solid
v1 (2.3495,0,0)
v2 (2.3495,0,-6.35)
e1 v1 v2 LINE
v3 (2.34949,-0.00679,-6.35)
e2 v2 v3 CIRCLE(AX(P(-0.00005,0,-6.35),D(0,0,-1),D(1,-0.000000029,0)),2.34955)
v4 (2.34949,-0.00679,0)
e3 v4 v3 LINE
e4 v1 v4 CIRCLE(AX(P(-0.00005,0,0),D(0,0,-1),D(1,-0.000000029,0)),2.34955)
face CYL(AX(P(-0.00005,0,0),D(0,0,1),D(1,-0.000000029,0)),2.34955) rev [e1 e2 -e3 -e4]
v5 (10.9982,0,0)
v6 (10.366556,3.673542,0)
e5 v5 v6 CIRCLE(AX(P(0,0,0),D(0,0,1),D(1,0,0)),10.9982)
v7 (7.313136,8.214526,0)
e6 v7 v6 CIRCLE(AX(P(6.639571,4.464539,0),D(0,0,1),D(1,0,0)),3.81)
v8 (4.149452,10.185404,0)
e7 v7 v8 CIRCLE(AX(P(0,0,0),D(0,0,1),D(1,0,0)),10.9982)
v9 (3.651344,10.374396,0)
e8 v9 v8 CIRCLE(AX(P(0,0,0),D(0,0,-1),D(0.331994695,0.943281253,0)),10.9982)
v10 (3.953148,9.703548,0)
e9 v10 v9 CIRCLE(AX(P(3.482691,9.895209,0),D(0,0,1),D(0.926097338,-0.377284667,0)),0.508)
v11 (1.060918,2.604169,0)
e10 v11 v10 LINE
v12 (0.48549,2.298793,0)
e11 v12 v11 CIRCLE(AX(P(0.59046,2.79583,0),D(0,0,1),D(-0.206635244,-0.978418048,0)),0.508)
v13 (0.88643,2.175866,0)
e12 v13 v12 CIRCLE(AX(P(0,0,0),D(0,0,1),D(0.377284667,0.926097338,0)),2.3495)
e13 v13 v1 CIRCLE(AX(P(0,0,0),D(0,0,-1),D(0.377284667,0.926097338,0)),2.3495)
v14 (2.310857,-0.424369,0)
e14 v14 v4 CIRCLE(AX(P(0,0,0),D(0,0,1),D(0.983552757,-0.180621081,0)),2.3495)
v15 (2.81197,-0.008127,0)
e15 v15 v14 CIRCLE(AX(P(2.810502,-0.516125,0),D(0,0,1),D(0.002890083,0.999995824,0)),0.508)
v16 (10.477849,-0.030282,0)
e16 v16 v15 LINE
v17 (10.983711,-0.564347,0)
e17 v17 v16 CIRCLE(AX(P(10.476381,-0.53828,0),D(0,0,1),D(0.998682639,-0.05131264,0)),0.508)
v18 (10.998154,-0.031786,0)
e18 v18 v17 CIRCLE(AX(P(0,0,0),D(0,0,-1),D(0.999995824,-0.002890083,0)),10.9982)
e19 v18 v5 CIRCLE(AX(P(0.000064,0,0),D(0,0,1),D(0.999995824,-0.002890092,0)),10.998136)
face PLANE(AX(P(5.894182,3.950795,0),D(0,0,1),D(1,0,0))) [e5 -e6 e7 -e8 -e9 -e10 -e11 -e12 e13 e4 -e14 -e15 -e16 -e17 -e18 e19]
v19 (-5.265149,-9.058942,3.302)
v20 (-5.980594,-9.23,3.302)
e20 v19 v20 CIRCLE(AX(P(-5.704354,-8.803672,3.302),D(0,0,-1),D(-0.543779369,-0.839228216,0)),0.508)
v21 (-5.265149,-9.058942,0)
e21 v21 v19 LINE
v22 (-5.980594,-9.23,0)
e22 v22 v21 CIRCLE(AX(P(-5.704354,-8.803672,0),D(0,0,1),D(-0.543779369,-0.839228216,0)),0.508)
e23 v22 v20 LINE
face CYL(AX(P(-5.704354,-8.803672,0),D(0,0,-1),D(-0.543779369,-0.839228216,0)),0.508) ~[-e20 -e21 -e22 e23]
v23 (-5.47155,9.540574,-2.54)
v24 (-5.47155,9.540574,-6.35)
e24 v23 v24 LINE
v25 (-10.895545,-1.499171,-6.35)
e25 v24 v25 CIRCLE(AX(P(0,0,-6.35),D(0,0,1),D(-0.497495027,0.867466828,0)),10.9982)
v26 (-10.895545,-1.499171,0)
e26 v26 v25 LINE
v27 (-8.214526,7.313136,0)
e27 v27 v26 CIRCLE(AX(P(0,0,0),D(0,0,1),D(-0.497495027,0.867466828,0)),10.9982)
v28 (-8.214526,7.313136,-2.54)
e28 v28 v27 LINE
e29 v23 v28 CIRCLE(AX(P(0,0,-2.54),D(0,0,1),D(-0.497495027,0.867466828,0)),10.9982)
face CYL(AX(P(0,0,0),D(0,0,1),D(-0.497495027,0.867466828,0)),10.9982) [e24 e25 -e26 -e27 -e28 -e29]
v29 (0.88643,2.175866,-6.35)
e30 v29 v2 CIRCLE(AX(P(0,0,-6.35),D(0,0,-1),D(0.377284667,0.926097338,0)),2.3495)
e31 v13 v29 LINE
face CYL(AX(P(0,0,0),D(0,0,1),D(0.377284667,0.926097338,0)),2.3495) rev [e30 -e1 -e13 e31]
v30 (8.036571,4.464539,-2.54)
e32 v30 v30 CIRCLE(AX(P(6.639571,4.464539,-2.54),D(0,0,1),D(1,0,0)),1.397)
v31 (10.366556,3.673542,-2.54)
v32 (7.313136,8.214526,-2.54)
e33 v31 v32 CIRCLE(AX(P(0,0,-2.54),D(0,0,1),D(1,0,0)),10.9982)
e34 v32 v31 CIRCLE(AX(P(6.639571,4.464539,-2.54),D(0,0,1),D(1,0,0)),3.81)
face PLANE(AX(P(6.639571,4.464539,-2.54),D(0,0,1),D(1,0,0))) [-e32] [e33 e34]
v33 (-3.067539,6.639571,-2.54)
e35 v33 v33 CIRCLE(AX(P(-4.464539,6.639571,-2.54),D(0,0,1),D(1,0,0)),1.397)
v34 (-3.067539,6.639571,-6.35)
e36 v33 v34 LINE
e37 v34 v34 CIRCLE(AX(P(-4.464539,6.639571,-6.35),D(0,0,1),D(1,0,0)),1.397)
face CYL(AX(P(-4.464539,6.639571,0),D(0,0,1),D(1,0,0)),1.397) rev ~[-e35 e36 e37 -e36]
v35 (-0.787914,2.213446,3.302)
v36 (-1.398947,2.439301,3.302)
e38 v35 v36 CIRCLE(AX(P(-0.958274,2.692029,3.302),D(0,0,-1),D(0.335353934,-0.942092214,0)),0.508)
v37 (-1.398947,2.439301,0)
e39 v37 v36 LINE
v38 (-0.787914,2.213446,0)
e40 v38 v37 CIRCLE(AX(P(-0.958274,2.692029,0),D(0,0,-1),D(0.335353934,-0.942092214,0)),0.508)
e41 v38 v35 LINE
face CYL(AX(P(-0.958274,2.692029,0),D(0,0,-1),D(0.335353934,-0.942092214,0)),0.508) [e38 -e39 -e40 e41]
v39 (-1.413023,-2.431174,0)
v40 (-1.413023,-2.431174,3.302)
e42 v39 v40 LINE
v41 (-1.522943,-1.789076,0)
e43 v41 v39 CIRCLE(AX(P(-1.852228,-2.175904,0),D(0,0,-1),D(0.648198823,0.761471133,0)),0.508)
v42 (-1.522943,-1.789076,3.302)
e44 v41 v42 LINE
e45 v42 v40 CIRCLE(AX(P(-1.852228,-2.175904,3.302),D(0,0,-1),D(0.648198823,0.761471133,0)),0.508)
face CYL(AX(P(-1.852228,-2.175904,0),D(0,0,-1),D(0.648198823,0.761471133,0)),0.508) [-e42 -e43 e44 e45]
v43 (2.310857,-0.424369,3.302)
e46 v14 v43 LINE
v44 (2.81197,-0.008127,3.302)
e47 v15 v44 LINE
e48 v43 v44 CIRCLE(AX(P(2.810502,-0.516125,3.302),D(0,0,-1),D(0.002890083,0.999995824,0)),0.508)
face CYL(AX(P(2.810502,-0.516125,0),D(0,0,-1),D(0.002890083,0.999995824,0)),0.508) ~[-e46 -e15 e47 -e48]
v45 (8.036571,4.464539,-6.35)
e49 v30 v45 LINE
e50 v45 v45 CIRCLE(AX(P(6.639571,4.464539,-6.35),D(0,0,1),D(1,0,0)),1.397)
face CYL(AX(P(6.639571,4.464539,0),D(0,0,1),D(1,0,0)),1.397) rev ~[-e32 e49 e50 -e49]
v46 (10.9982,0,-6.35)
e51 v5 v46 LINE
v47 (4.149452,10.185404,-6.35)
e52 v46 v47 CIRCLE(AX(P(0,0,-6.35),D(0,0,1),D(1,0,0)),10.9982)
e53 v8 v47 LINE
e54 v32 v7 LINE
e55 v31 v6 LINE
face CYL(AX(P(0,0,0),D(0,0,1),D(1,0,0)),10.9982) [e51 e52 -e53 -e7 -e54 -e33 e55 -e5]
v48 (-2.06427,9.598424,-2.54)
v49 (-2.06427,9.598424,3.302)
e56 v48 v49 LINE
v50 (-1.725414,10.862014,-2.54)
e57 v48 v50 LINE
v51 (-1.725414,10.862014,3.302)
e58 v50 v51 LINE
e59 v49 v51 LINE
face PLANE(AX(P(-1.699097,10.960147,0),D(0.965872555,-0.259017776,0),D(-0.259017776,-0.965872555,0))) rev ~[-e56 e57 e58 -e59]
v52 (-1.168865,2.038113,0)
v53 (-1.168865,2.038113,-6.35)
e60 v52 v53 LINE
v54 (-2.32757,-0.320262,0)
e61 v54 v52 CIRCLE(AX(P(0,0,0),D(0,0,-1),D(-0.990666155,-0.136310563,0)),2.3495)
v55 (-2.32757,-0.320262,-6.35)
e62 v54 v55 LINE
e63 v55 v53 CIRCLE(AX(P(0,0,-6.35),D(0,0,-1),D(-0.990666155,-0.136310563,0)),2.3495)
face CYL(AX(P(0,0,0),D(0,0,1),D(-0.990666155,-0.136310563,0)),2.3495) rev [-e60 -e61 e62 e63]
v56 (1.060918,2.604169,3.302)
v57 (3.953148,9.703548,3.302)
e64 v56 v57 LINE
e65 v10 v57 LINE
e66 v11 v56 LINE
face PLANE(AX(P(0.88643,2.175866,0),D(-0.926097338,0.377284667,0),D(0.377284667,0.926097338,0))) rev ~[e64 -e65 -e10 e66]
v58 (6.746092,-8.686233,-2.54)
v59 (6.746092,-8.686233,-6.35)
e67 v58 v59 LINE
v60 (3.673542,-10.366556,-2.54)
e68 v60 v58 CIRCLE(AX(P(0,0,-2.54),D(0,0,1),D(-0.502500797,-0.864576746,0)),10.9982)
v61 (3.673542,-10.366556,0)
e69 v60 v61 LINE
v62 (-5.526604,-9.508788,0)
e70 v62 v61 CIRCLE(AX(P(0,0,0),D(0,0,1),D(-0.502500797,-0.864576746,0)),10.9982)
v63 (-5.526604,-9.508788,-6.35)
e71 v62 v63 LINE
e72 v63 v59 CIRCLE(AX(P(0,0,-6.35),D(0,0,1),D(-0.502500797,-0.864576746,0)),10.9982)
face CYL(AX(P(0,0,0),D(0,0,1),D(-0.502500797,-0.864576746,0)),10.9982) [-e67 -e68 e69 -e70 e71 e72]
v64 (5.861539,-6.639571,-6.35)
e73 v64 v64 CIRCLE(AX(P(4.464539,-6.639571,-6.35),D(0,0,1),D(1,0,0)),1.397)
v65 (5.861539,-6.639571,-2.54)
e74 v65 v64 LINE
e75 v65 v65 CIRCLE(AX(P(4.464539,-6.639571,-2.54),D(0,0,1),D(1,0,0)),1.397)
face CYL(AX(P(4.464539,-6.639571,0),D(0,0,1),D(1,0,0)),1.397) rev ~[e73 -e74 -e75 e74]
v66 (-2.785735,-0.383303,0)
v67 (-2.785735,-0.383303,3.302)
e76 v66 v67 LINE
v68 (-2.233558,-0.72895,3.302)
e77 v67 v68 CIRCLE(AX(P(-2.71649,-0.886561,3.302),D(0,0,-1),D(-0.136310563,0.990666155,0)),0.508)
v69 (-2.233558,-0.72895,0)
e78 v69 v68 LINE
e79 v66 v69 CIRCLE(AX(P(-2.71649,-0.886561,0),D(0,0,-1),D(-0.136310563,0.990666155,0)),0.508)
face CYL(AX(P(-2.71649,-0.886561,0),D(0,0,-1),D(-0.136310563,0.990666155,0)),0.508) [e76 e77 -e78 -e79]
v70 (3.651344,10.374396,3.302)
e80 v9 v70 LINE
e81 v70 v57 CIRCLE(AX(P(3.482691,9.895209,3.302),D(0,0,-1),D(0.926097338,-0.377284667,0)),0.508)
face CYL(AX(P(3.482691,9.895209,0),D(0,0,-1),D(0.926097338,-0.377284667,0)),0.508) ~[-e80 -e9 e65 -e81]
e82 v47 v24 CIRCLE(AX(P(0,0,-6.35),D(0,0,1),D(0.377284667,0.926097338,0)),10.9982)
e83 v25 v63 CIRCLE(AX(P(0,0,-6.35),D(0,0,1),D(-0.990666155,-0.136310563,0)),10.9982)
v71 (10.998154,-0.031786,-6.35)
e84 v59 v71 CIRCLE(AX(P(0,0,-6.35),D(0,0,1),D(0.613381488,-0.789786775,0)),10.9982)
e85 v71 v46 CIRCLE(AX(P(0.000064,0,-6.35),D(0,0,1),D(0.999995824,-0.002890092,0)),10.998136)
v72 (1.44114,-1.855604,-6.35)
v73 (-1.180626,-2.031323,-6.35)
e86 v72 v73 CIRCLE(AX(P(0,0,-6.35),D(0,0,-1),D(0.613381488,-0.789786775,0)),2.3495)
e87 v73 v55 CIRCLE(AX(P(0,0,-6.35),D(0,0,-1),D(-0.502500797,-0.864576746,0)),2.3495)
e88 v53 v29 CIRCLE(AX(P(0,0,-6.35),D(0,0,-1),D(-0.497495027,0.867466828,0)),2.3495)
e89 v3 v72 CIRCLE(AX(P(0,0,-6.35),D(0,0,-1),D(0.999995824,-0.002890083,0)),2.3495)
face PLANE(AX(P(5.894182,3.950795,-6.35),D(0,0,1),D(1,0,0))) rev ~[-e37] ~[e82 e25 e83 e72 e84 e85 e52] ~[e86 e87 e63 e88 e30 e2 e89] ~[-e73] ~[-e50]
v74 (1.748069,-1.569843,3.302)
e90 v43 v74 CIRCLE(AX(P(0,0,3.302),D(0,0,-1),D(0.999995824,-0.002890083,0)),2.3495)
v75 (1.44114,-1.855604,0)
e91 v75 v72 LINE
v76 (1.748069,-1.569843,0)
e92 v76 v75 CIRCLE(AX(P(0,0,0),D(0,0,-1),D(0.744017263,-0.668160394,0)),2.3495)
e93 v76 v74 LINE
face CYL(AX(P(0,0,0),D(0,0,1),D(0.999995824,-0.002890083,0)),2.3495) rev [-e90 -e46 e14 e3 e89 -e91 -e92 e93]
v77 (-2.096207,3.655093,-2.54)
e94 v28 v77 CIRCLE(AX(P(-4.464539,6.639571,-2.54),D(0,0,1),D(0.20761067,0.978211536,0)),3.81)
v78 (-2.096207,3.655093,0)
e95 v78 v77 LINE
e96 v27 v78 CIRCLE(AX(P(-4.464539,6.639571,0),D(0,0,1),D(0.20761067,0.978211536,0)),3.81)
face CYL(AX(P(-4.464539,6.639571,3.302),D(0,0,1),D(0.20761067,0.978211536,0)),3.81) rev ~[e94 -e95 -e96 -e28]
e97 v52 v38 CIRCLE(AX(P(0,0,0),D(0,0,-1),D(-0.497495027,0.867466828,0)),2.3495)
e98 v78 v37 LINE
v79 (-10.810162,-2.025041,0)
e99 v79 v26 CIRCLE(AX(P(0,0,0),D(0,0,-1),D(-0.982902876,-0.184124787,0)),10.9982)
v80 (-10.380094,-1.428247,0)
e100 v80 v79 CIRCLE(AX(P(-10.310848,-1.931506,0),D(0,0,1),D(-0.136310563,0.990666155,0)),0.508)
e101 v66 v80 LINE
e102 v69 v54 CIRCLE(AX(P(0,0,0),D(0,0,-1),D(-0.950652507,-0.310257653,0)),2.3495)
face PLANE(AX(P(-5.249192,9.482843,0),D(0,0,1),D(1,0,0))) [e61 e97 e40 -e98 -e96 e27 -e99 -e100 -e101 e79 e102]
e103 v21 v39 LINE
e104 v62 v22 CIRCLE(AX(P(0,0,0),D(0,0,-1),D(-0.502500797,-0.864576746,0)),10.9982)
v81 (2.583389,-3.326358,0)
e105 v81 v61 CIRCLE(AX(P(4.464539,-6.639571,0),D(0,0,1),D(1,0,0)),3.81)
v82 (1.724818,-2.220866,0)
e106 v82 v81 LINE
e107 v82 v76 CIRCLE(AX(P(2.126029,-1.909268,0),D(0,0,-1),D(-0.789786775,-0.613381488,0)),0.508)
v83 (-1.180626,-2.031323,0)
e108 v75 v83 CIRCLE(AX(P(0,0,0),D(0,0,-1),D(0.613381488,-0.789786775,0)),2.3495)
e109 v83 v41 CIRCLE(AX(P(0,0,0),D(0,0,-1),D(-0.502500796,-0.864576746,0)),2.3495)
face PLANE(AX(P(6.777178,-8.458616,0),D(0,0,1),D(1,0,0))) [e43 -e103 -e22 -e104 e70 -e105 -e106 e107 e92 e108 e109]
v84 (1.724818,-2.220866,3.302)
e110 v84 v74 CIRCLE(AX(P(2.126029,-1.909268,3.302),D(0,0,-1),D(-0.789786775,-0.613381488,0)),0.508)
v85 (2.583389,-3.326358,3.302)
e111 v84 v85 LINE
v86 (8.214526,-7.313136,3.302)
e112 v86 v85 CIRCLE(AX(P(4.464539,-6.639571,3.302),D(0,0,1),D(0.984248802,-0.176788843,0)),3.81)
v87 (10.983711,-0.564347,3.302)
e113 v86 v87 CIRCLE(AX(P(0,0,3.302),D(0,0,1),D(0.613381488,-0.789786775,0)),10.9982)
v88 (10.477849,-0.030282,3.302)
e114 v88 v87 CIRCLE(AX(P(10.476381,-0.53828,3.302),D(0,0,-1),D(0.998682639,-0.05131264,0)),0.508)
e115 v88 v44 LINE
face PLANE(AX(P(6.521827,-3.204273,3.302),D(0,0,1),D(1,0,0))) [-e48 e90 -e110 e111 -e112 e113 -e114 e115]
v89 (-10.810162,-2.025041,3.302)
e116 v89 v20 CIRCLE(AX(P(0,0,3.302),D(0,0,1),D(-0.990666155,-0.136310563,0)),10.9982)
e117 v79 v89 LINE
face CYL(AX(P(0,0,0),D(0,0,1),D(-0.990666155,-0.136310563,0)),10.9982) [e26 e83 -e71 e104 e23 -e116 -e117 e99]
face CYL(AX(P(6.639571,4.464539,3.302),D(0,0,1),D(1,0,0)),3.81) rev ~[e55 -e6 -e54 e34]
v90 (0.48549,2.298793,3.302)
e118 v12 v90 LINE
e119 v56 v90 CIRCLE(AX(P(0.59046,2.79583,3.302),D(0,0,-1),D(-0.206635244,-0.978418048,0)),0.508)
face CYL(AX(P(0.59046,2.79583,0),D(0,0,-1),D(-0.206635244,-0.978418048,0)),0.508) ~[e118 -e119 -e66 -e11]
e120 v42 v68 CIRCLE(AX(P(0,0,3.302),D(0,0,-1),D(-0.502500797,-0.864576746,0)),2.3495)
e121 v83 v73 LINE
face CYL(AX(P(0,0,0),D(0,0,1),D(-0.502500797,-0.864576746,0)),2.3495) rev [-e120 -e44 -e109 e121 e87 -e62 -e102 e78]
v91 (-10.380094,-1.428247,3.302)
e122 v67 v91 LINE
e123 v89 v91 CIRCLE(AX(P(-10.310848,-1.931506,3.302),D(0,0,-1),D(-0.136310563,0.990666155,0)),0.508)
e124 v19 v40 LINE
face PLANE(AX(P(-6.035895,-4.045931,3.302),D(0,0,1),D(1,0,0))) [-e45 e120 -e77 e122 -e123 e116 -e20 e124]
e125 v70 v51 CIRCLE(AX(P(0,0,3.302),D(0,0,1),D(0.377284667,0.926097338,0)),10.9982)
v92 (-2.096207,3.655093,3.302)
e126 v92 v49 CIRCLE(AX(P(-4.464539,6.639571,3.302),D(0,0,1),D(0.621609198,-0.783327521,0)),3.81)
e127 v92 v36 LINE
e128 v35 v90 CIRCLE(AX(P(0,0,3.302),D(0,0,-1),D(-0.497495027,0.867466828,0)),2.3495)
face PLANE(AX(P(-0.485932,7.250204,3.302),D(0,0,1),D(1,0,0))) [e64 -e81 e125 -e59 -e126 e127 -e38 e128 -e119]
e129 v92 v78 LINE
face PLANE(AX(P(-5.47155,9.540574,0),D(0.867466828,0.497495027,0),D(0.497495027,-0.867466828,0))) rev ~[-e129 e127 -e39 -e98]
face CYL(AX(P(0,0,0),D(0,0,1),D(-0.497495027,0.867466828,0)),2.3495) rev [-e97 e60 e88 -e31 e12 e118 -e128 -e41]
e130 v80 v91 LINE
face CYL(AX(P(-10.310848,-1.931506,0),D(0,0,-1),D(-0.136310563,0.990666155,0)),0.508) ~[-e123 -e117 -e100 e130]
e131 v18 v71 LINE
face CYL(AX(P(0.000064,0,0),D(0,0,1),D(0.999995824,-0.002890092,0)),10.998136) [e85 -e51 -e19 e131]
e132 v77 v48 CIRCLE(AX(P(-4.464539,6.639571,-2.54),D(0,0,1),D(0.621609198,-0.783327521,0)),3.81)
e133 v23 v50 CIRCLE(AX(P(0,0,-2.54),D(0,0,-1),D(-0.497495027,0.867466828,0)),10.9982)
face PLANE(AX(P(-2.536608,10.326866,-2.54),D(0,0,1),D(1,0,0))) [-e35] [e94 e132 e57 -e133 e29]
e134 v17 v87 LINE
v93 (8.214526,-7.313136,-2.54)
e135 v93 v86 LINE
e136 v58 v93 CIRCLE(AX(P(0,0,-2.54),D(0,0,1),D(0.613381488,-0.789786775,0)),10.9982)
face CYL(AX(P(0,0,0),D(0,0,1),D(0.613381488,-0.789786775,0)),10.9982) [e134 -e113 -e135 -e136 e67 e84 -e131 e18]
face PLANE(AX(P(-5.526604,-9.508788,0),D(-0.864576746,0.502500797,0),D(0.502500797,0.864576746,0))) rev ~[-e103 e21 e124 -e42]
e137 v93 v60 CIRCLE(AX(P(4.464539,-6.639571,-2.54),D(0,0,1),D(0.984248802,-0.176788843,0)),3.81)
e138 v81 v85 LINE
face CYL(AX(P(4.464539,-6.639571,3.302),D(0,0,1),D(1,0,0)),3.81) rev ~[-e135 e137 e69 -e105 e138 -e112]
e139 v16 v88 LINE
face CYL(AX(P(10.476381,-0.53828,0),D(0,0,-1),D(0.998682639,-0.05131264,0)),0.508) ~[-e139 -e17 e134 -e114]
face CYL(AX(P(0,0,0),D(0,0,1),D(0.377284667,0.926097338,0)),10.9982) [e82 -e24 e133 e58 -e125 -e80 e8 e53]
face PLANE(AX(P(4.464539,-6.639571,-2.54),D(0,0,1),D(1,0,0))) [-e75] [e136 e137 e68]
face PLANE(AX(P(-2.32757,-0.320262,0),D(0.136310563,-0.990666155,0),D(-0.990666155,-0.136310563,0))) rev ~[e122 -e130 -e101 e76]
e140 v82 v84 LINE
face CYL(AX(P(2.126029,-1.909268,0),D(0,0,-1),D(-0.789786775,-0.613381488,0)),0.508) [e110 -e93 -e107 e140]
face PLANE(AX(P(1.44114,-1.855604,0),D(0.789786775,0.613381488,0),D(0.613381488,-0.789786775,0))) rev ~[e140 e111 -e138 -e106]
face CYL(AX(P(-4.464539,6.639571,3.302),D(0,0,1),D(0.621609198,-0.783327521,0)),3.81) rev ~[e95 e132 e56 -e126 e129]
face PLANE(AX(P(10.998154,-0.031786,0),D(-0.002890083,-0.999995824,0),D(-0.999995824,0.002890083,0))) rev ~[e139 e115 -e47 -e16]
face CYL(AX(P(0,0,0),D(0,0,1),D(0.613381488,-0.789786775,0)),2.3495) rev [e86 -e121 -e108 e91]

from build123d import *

# Parameters (mm, degrees)
F1_DEPTH      = 3.302
F2_DEPTH      = 6.35
F3_T1_DEPTH   = 4.6338919233
F4_T1_DEPTH   = 4.4582047696
F5_R          = 1.397
F6_DEPTH      = 6.351
F6_DEPTH_BACK = 25.4
F7_R          = 3.81
F8_DEPTH      = 5.842
F9_T1_DEPTH   = 8.456355204
F9_T3_DEPTH   = 2.54


# Not quite as in the source:
# - a fillet or chamfer that OpenCascade refuses, or shapes differently, is made with other operations: its cross-section is extruded or revolved along the edge and cut away or added


with BuildPart() as f1:
    # F0 (on Top) → F1 (new body)
    with BuildSketch(Plane.XY):
        with BuildLine():
            Line((0.8864303251, 2.1758656964), (4.1494522244, 10.1854037464))
            ThreePointArc((4.1494522244, 10.1854037464), (-0.7354841661, 10.9735803766), (-5.4715498037, 9.5405736717))
            Line((-5.4715498037, 9.5405736717), (-1.1688645655, 2.0381133132))
            ThreePointArc((-1.1688645655, 2.0381133132), (-0.157118442, 2.3442406116), (0.8864303251, 2.1758656964))
        make_face()
    extrude(amount=F1_DEPTH)



with BuildPart() as f1b:
    # F0 (on Top) → F1, piece 2 (new body)
    with BuildSketch(Plane.XY):
        with BuildLine():
            Line((-2.3275701308, -0.320261668), (-10.8955445044, -1.4991708351))
            ThreePointArc((-10.8955445044, -1.4991708351), (-9.1356572935, -6.1237381602), (-5.5266042645, -9.5087879639))
            Line((-5.5266042645, -9.5087879639), (-1.1806256223, -2.0313230639))
            ThreePointArc((-1.1806256223, -2.0313230639), (-1.9516127013, -1.3081888679), (-2.3275701308, -0.320261668))
        make_face()
    extrude(amount=F1_DEPTH)


with BuildPart() as f1c:
    # F0 (on Top) → F1, piece 3 (new body)
    with BuildSketch(Plane.XY):
        with BuildLine():
            ThreePointArc((6.74609228, -8.6862329113), (9.8711414597, -4.8498422164), (10.9981540682, -0.0317857078))
            Line((10.9981540682, -0.0317857078), (2.3494901878, -0.0067902494))
            ThreePointArc((2.3494901878, -0.0067902494), (2.1087311432, -1.0360517437), (1.4411398058, -1.8556040284))
            Line((1.4411398058, -1.8556040284), (6.74609228, -8.6862329113))
        make_face()
    extrude(amount=F1_DEPTH)


with BuildPart() as f1_1:
    add(f1.part)

    add(f1b.part)  # F2 merges F1b

    add(f1c.part)  # F2 merges F1c
    # F0 (on Top) → F2 (join)
    with BuildSketch(Plane.XY):
        with BuildLine():
            ThreePointArc((10.9981540682, -0.0317857078), (10.9981885171, -0.0158928705), (10.9982, 0))
            ThreePointArc((10.9982, 0), (9.1267986911, 6.136933183), (4.1494522244, 10.1854037464))
            Line((4.1494522244, 10.1854037464), (0.8864303251, 2.1758656964))
            ThreePointArc((0.8864303251, 2.1758656964), (1.9497202747, 1.3110076661), (2.3495, 0))
            ThreePointArc((2.3495, 0), (2.3494975469, -0.0033951282), (2.3494901878, -0.0067902494))
            Line((2.3494901878, -0.0067902494), (10.9981540682, -0.0317857078))
        make_face()
        with BuildLine():
            Line((0.8864303251, 2.1758656964), (4.1494522244, 10.1854037464))
            ThreePointArc((4.1494522244, 10.1854037464), (-0.7354841661, 10.9735803766), (-5.4715498037, 9.5405736717))
            Line((-5.4715498037, 9.5405736717), (-1.1688645655, 2.0381133132))
            ThreePointArc((-1.1688645655, 2.0381133132), (-0.157118442, 2.3442406116), (0.8864303251, 2.1758656964))
        make_face()
        with BuildLine():
            ThreePointArc((6.74609228, -8.6862329113), (9.8711414597, -4.8498422164), (10.9981540682, -0.0317857078))
            Line((10.9981540682, -0.0317857078), (2.3494901878, -0.0067902494))
            ThreePointArc((2.3494901878, -0.0067902494), (2.1087311432, -1.0360517437), (1.4411398058, -1.8556040284))
            Line((1.4411398058, -1.8556040284), (6.74609228, -8.6862329113))
        make_face()
        with BuildLine():
            Line((-1.1688645655, 2.0381133132), (-5.4715498037, 9.5405736717))
            ThreePointArc((-5.4715498037, 9.5405736717), (-9.8711414597, 4.8498422164), (-10.8955445044, -1.4991708351))
            Line((-10.8955445044, -1.4991708351), (-2.3275701308, -0.320261668))
            ThreePointArc((-2.3275701308, -0.320261668), (-2.1087311432, 1.0360517437), (-1.1688645655, 2.0381133132))
        make_face()
        with BuildLine():
            ThreePointArc((-5.5266042645, -9.5087879639), (0.7354841661, -10.9735803766), (6.74609228, -8.6862329113))
            Line((6.74609228, -8.6862329113), (1.4411398058, -1.8556040284))
            ThreePointArc((1.4411398058, -1.8556040284), (0.157118442, -2.3442406116), (-1.1806256223, -2.0313230639))
            Line((-1.1806256223, -2.0313230639), (-5.5266042645, -9.5087879639))
        make_face()
        with BuildLine():
            Line((-2.3275701308, -0.320261668), (-10.8955445044, -1.4991708351))
            ThreePointArc((-10.8955445044, -1.4991708351), (-9.1356572935, -6.1237381602), (-5.5266042645, -9.5087879639))
            Line((-5.5266042645, -9.5087879639), (-1.1806256223, -2.0313230639))
            ThreePointArc((-1.1806256223, -2.0313230639), (-1.9516127013, -1.3081888679), (-2.3275701308, -0.320261668))
        make_face()
    extrude(amount=-F2_DEPTH)

    # F3: fillet of radius 0.508 on 6 edges, made by hand

    # F3_s2 → F3_t1 (cut)
    with BuildSketch(Plane.XY):
        with BuildLine():
            ThreePointArc((3.9531481969, 9.7035483908), (3.9459668292, 10.1036299064), (3.6513440541, 10.3743958782))
            ThreePointArc((3.6513440541, 10.3743958782), (3.901542663, 10.2829163222), (4.1494522244, 10.1854037464))
            Line((4.1494522244, 10.1854037464), (3.9531481969, 9.7035483908))
        make_face()
        with BuildLine():
            ThreePointArc((10.9837113978, -0.5643466757), (10.8451967866, -0.1889395718), (10.4778487793, -0.0302819762))
            Line((10.4778487793, -0.0302819762), (10.9981540682, -0.0317857078))
            ThreePointArc((10.9981540682, -0.0317857078), (10.9941578867, -0.2981536556), (10.9837113978, -0.5643466757))
        make_face()
        with BuildLine():
            ThreePointArc((-5.212699429, 9.089224208), (-5.2589719244, 9.4866857122), (-5.0031171412, 9.7943464361))
            ThreePointArc((-5.0031171412, 9.7943464361), (-5.2388703034, 9.6702968509), (-5.4715498037, 9.5405736717))
            Line((-5.4715498037, 9.5405736717), (-5.212699429, 9.089224208))
        make_face()
        with BuildLine():
            ThreePointArc((7.1588183524, -8.3493546479), (6.7770167548, -8.4691224698), (6.4269453148, -8.2753009589))
            Line((6.4269453148, -8.2753009589), (6.74609228, -8.6862329113))
            ThreePointArc((6.74609228, -8.6862329113), (6.9544954285, -8.5202932212), (7.1588183524, -8.3493546479))
        make_face()
        with BuildLine():
            ThreePointArc((-5.9805942565, -9.2299997605), (-5.5862248623, -9.2977461404), (-5.2651493503, -9.0589422318))
            Line((-5.2651493503, -9.0589422318), (-5.5266042645, -9.5087879639))
            ThreePointArc((-5.5266042645, -9.5087879639), (-5.7552875833, -9.3721431953), (-5.9805942565, -9.2299997605))
        make_face()
        with BuildLine():
            ThreePointArc((-10.3800935118, -1.428247432), (-10.722983584, -1.6345074366), (-10.8101624065, -2.0250412303))
            ThreePointArc((-10.8101624065, -2.0250412303), (-10.8560380915, -1.762623101), (-10.8955445044, -1.4991708351))
            Line((-10.8955445044, -1.4991708351), (-10.3800935118, -1.428247432))
        make_face()
    extrude(amount=F3_T1_DEPTH, mode=Mode.SUBTRACT)

    # F4: fillet of radius 0.508 on 6 edges, made by hand

    # F4_s2 → F4_t1 (cut)
    with BuildSketch(Plane.XY):
        with BuildLine():
            ThreePointArc((-2.7857353042, -0.3833028373), (-2.4469491553, -0.4559663275), (-2.2335580647, -0.7289503561))
            ThreePointArc((-2.2335580647, -0.7289503561), (-2.2897006824, -0.5267077321), (-2.3275701308, -0.320261668))
            Line((-2.3275701308, -0.320261668), (-2.7857353042, -0.3833028373))
        make_face()
        with BuildLine():
            ThreePointArc((-1.5229431343, -1.7890764264), (-1.3515120564, -2.0901867434), (-1.4130231496, -2.4311741667))
            Line((-1.4130231496, -2.4311741667), (-1.1806256223, -2.0313230639))
            ThreePointArc((-1.1806256223, -2.0313230639), (-1.3572000088, -1.9178525455), (-1.5229431343, -1.7890764264))
        make_face()
        with BuildLine():
            ThreePointArc((-0.7879140674, 2.2134456561), (-1.1343987902, 2.215537146), (-1.3989470146, 2.439301027))
            Line((-1.3989470146, 2.439301027), (-1.1688645655, 2.0381133132))
            ThreePointArc((-1.1688645655, 2.0381133132), (-0.9823090207, 2.1342959584), (-0.7879140674, 2.2134456561))
        make_face()
        with BuildLine():
            ThreePointArc((0.4854895058, 2.2987932029), (0.8285961548, 2.3471032941), (1.0609176577, 2.6041689603))
            Line((1.0609176577, 2.6041689603), (0.8864303251, 2.1758656964))
            ThreePointArc((0.8864303251, 2.1758656964), (0.6887080648, 2.2462928241), (0.4854895058, 2.2987932029))
        make_face()
        with BuildLine():
            ThreePointArc((1.7248176465, -2.220866123), (1.6183530006, -1.8911369665), (1.7480685589, -1.5698428468))
            ThreePointArc((1.7480685589, -1.5698428468), (1.6009926176, -1.719585092), (1.4411398058, -1.8556040284))
            Line((1.4411398058, -1.8556040284), (1.7248176465, -2.220866123))
        make_face()
        with BuildLine():
            ThreePointArc((2.8119701642, -0.0081268603), (2.4859108466, -0.1253504027), (2.3108572018, -0.4243692296))
            ThreePointArc((2.3108572018, -0.4243692296), (2.3395090295, -0.2164434129), (2.3494901878, -0.0067902494))
            Line((2.3494901878, -0.0067902494), (2.8119701642, -0.0081268603))
        make_face()
    extrude(amount=F4_T1_DEPTH, mode=Mode.SUBTRACT)

    # F5 (on face) → F6 (cut, two sides)
    with BuildSketch(Plane.XY) as f6_sk:
        with Locations((-4.4645385024, 6.6395705404)):
            Circle(F5_R)
        with Locations((6.6395705404, 4.4645385024)):
            Circle(F5_R)
        with Locations((4.4645385024, -6.6395705404)):
            Circle(F5_R)
    extrude(amount=-F6_DEPTH, mode=Mode.SUBTRACT)
    extrude(f6_sk.sketch, amount=F6_DEPTH_BACK, mode=Mode.SUBTRACT)

    # F7 (on face) → F8 (cut)
    with BuildSketch(Plane.XY.offset(3.302)):
        with Locations((4.4645385024, -6.6395705404)):
            Circle(F7_R)
        with Locations((6.6395705404, 4.4645385024)):
            Circle(F7_R)
        with BuildLine():
            ThreePointArc((-2.0962074568, 3.6550926868), (-1.0338358569, 4.9823501693), (-0.6545385024, 6.6395705404))
            ThreePointArc((-0.6545385024, 6.6395705404), (-1.5039813545, 9.0377367927), (-3.6735418484, 10.3665564933))
            ThreePointArc((-3.6735418484, 10.3665564933), (-4.3477533155, 10.102348457), (-5.0031171412, 9.7943464361))
            ThreePointArc((-5.0031171412, 9.7943464361), (-5.2589719244, 9.4866857122), (-5.212699429, 9.089224208))
            Line((-5.212699429, 9.089224208), (-4.6049424864, 8.0294970569))
            ThreePointArc((-4.6049424864, 8.0294970569), (-3.5276648091, 7.6758507548), (-3.0675385024, 6.6395705404))
            ThreePointArc((-3.0675385024, 6.6395705404), (-3.1362873981, 6.2067218326), (-3.3357675701, 5.8164756598))
            Line((-3.3357675701, 5.8164756598), (-2.0962074568, 3.6550926868))
        make_face()
        with BuildLine():
            ThreePointArc((-5.0031171412, 9.7943464361), (-4.3477533155, 10.102348457), (-3.6735418484, 10.3665564933))
            ThreePointArc((-3.6735418484, 10.3665564933), (-8.1734837008, 5.7678908314), (-2.0962074568, 3.6550926868))
            Line((-2.0962074568, 3.6550926868), (-3.3357675701, 5.8164756598))
            ThreePointArc((-3.3357675701, 5.8164756598), (-3.1362873981, 6.2067218326), (-3.0675385024, 6.6395705404))
            ThreePointArc((-3.0675385024, 6.6395705404), (-3.5276648091, 7.6758507548), (-4.6049424864, 8.0294970569))
            Line((-4.6049424864, 8.0294970569), (-5.212699429, 9.089224208))
            ThreePointArc((-5.212699429, 9.089224208), (-5.2589719244, 9.4866857122), (-5.0031171412, 9.7943464361))
        make_face()
    extrude(amount=-F8_DEPTH, mode=Mode.SUBTRACT)

    # F9: chamfer of 2.54 on 2 edges, made by hand

    # F9_s2 → F9_t1 (cut)
    with BuildSketch(Plane.XY):
        with BuildLine():
            Line((-1.6990973778, 10.9601467928), (-2.0905864719, 9.5002911113))
            Line((-2.0905864719, 9.5002911113), (-2.1225900483, 9.460839735))
            ThreePointArc((-2.1225900483, 9.460839735), (-2.8366247449, 10.0280040188), (-3.6840884704, 10.3168633472))
            Line((-3.6840884704, 10.3168633472), (-3.6905097091, 10.4144389713))
            ThreePointArc((-3.6905097091, 10.4144389713), (-2.6991406456, 10.7142447599), (-1.7070669555, 11.0103177588))
            Line((-1.7070669555, 11.0103177588), (-1.6990973778, 10.9601467928))
        make_face()
    extrude(amount=F9_T1_DEPTH, mode=Mode.SUBTRACT)

    # F9_s4 → F9_t3 (cut)
    with BuildSketch(Plane.XY.offset(-2.54)):
        with BuildLine():
            Line((-2.0905864719, 9.5002911113), (-1.6990973778, 10.9601467928))
            Line((-1.6990973778, 10.9601467928), (-1.7070669555, 11.0103177588))
            ThreePointArc((-1.7070669555, 11.0103177588), (-2.6991406456, 10.7142447599), (-3.6905097091, 10.4144389713))
            Line((-3.6905097091, 10.4144389713), (-3.6840884704, 10.3168633472))
            ThreePointArc((-3.6840884704, 10.3168633472), (-2.8366247449, 10.0280040188), (-2.1225900483, 9.460839735))
            Line((-2.1225900483, 9.460839735), (-2.0905864719, 9.5002911113))
        make_face()
    extrude(amount=F9_T3_DEPTH, mode=Mode.SUBTRACT)


solid = f1_1.part
